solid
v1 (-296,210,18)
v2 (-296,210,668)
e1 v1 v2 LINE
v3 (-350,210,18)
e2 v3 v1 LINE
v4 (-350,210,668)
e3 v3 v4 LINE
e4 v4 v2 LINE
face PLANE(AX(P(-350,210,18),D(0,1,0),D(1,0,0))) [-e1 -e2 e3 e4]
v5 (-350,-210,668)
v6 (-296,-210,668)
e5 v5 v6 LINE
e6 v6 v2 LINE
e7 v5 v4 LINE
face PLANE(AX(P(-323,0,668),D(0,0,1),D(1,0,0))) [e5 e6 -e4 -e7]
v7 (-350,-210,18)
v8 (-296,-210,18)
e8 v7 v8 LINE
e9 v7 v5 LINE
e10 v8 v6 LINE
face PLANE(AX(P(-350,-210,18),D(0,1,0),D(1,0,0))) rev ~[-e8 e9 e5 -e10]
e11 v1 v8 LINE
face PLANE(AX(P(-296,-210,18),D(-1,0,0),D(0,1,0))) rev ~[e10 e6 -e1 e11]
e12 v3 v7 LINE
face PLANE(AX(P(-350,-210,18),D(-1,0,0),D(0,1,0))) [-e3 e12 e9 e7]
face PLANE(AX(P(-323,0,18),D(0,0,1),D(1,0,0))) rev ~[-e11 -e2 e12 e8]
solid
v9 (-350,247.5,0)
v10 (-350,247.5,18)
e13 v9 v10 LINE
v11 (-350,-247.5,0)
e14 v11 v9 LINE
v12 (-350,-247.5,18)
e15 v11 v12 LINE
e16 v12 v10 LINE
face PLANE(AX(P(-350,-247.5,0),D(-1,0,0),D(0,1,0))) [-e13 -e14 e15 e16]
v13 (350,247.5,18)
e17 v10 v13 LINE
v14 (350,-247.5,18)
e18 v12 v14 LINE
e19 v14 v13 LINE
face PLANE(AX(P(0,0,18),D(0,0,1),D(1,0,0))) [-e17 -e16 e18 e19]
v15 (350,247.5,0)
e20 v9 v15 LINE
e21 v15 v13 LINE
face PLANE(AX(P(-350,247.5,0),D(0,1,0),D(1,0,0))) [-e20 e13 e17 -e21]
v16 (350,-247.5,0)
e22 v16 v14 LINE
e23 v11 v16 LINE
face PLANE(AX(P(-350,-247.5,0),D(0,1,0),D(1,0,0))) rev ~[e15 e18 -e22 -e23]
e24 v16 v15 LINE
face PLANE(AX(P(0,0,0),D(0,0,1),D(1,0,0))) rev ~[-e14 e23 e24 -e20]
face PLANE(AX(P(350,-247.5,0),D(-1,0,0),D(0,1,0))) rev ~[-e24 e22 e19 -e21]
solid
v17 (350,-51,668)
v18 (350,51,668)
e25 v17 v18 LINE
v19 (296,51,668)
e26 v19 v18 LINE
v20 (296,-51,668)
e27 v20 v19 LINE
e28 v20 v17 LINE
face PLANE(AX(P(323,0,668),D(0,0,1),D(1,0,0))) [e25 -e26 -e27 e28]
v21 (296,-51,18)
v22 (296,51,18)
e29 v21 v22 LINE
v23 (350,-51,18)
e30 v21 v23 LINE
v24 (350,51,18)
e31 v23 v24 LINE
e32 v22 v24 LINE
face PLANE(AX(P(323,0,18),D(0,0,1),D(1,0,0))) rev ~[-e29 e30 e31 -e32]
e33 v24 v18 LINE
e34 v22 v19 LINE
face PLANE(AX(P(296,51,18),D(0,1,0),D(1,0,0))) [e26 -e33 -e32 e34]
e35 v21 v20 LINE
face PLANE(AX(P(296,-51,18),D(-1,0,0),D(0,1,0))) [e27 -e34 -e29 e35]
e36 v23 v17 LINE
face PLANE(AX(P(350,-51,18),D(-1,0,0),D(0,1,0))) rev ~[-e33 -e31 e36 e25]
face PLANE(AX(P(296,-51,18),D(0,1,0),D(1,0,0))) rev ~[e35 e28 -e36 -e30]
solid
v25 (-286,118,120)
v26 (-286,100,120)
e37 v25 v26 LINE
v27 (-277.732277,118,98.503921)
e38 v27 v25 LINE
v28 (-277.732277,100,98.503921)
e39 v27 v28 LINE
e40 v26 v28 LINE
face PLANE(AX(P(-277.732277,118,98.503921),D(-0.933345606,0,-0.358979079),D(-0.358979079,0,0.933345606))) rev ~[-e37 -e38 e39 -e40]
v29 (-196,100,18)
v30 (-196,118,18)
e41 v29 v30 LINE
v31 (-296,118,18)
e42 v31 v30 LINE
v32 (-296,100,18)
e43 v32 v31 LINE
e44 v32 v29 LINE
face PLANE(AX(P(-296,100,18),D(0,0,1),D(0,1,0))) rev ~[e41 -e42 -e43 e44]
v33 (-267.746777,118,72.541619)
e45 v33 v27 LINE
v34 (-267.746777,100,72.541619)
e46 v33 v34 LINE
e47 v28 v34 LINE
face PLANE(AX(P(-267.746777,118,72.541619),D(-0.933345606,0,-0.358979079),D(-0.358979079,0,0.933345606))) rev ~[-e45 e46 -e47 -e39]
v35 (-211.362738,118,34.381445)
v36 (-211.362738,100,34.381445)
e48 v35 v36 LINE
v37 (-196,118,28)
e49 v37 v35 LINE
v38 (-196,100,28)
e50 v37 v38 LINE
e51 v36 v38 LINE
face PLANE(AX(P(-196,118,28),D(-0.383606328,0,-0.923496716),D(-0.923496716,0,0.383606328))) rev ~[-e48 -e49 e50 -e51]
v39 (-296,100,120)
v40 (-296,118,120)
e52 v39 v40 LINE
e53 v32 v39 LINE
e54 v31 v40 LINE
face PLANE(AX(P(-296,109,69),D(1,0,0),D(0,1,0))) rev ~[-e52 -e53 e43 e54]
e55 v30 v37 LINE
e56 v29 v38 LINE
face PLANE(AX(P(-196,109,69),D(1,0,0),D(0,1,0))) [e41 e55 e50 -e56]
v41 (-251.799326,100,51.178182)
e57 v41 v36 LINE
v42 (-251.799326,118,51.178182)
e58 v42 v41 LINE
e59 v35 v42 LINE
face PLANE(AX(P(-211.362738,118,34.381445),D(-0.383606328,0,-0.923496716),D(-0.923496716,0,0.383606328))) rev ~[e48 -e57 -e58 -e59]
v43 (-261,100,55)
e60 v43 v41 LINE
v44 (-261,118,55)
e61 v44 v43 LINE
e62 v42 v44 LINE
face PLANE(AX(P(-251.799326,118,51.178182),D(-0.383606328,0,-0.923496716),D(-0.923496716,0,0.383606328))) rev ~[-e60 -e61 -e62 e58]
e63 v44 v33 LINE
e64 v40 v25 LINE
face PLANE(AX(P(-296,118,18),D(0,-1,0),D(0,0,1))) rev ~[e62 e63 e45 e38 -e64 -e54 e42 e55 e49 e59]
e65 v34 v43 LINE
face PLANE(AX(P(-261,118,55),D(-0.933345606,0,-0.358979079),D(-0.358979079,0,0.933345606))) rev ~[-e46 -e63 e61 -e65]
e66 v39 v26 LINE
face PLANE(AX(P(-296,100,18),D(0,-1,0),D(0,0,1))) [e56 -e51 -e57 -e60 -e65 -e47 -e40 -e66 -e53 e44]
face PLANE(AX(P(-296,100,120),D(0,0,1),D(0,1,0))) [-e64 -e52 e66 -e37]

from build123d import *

# Parameters (mm, degrees)
F0_W      = 700
F0_H      = 495
F1_DEPTH  = 18
F2_W      = 54
F2_H      = 420
F3_DEPTH  = 650
F2_H_2    = 102
F4_W      = 102
F4_H      = 650
F5_DEPTH  = 700.001
F6_W      = 18
F6_H      = 102
F7_DEPTH  = 100
F8_DEPTH  = 650
F10_DEPTH = 25


# Not quite as in the source:
# - a feature names something its author has since deleted; it is built from what else it names


with BuildPart() as f1:
    # F0 (on Top) → F1 (new body)
    with BuildSketch(Plane.XY):
        Rectangle(F0_W, F0_H)
    extrude(amount=F1_DEPTH)


with BuildPart() as f3:
    # F2 (on face) → F3 (new body)
    with BuildSketch(Plane.XY.offset(18)):
        with Locations((-323, 0)):
            Rectangle(F2_W, F2_H)
    extrude(amount=F3_DEPTH)


with BuildPart() as f3b:
    # F2 (on face) → F3, piece 2 (new body)
    with BuildSketch(Plane.XY.offset(18)):
        with Locations((323, 0)):
            Rectangle(F2_W, F2_H_2)
    extrude(amount=F3_DEPTH)


with BuildPart() as f5_tool:
    # F4 (on face) → F5 (new body, through all)
    with BuildSketch(Plane.YZ.offset(350)):
        with Locations((0, 343)):
            Rectangle(F4_W, F4_H)
    extrude(amount=-F5_DEPTH)


with BuildPart() as f3_1:
    add(f3.part)

    # F5: cut by f5_tool
    add(f5_tool.part, mode=Mode.SUBTRACT)

    # F2 (on face) → F8 (join)
    with BuildSketch(Plane.XY.offset(18)):
        with Locations((-323, 0)):
            Rectangle(F2_W, F2_H)
    extrude(amount=F8_DEPTH)


with BuildPart() as f3b_1:
    add(f3b.part)

    # F5: cut by f5_tool
    add(f5_tool.part, mode=Mode.SUBTRACT)


with BuildPart() as f7:
    # F6 (on face) → F7 (new body)
    with BuildSketch(Plane.YZ.offset(-296)):
        with Locations((109, 69)):
            Rectangle(F6_W, F6_H)
    extrude(amount=F7_DEPTH)

    # F9 (on face) → F10 (cut)
    with BuildSketch(Plane(origin=(0, 118, 0), x_dir=(-1, 0, 0), z_dir=(0, 1, 0))):
        Polygon((261, 55), (267.7467766581, 72.5416193109), (277.7322773327, 98.5039210651), (286, 120), (251, 120), (196, 120), (196, 28), (211.3627376398, 34.3814448658), (251.799326006, 51.1781815717), align=None)
    extrude(amount=-F10_DEPTH, mode=Mode.SUBTRACT)


with BuildPart() as f8:
    # F2 (on face) → F8, piece 2 (new body)
    with BuildSketch(Plane.XY.offset(18)):
        with Locations((323, 0)):
            Rectangle(F2_W, F2_H_2)
    extrude(amount=F8_DEPTH)


solid = Compound([f1.part, f3_1.part, f7.part, f8.part])
